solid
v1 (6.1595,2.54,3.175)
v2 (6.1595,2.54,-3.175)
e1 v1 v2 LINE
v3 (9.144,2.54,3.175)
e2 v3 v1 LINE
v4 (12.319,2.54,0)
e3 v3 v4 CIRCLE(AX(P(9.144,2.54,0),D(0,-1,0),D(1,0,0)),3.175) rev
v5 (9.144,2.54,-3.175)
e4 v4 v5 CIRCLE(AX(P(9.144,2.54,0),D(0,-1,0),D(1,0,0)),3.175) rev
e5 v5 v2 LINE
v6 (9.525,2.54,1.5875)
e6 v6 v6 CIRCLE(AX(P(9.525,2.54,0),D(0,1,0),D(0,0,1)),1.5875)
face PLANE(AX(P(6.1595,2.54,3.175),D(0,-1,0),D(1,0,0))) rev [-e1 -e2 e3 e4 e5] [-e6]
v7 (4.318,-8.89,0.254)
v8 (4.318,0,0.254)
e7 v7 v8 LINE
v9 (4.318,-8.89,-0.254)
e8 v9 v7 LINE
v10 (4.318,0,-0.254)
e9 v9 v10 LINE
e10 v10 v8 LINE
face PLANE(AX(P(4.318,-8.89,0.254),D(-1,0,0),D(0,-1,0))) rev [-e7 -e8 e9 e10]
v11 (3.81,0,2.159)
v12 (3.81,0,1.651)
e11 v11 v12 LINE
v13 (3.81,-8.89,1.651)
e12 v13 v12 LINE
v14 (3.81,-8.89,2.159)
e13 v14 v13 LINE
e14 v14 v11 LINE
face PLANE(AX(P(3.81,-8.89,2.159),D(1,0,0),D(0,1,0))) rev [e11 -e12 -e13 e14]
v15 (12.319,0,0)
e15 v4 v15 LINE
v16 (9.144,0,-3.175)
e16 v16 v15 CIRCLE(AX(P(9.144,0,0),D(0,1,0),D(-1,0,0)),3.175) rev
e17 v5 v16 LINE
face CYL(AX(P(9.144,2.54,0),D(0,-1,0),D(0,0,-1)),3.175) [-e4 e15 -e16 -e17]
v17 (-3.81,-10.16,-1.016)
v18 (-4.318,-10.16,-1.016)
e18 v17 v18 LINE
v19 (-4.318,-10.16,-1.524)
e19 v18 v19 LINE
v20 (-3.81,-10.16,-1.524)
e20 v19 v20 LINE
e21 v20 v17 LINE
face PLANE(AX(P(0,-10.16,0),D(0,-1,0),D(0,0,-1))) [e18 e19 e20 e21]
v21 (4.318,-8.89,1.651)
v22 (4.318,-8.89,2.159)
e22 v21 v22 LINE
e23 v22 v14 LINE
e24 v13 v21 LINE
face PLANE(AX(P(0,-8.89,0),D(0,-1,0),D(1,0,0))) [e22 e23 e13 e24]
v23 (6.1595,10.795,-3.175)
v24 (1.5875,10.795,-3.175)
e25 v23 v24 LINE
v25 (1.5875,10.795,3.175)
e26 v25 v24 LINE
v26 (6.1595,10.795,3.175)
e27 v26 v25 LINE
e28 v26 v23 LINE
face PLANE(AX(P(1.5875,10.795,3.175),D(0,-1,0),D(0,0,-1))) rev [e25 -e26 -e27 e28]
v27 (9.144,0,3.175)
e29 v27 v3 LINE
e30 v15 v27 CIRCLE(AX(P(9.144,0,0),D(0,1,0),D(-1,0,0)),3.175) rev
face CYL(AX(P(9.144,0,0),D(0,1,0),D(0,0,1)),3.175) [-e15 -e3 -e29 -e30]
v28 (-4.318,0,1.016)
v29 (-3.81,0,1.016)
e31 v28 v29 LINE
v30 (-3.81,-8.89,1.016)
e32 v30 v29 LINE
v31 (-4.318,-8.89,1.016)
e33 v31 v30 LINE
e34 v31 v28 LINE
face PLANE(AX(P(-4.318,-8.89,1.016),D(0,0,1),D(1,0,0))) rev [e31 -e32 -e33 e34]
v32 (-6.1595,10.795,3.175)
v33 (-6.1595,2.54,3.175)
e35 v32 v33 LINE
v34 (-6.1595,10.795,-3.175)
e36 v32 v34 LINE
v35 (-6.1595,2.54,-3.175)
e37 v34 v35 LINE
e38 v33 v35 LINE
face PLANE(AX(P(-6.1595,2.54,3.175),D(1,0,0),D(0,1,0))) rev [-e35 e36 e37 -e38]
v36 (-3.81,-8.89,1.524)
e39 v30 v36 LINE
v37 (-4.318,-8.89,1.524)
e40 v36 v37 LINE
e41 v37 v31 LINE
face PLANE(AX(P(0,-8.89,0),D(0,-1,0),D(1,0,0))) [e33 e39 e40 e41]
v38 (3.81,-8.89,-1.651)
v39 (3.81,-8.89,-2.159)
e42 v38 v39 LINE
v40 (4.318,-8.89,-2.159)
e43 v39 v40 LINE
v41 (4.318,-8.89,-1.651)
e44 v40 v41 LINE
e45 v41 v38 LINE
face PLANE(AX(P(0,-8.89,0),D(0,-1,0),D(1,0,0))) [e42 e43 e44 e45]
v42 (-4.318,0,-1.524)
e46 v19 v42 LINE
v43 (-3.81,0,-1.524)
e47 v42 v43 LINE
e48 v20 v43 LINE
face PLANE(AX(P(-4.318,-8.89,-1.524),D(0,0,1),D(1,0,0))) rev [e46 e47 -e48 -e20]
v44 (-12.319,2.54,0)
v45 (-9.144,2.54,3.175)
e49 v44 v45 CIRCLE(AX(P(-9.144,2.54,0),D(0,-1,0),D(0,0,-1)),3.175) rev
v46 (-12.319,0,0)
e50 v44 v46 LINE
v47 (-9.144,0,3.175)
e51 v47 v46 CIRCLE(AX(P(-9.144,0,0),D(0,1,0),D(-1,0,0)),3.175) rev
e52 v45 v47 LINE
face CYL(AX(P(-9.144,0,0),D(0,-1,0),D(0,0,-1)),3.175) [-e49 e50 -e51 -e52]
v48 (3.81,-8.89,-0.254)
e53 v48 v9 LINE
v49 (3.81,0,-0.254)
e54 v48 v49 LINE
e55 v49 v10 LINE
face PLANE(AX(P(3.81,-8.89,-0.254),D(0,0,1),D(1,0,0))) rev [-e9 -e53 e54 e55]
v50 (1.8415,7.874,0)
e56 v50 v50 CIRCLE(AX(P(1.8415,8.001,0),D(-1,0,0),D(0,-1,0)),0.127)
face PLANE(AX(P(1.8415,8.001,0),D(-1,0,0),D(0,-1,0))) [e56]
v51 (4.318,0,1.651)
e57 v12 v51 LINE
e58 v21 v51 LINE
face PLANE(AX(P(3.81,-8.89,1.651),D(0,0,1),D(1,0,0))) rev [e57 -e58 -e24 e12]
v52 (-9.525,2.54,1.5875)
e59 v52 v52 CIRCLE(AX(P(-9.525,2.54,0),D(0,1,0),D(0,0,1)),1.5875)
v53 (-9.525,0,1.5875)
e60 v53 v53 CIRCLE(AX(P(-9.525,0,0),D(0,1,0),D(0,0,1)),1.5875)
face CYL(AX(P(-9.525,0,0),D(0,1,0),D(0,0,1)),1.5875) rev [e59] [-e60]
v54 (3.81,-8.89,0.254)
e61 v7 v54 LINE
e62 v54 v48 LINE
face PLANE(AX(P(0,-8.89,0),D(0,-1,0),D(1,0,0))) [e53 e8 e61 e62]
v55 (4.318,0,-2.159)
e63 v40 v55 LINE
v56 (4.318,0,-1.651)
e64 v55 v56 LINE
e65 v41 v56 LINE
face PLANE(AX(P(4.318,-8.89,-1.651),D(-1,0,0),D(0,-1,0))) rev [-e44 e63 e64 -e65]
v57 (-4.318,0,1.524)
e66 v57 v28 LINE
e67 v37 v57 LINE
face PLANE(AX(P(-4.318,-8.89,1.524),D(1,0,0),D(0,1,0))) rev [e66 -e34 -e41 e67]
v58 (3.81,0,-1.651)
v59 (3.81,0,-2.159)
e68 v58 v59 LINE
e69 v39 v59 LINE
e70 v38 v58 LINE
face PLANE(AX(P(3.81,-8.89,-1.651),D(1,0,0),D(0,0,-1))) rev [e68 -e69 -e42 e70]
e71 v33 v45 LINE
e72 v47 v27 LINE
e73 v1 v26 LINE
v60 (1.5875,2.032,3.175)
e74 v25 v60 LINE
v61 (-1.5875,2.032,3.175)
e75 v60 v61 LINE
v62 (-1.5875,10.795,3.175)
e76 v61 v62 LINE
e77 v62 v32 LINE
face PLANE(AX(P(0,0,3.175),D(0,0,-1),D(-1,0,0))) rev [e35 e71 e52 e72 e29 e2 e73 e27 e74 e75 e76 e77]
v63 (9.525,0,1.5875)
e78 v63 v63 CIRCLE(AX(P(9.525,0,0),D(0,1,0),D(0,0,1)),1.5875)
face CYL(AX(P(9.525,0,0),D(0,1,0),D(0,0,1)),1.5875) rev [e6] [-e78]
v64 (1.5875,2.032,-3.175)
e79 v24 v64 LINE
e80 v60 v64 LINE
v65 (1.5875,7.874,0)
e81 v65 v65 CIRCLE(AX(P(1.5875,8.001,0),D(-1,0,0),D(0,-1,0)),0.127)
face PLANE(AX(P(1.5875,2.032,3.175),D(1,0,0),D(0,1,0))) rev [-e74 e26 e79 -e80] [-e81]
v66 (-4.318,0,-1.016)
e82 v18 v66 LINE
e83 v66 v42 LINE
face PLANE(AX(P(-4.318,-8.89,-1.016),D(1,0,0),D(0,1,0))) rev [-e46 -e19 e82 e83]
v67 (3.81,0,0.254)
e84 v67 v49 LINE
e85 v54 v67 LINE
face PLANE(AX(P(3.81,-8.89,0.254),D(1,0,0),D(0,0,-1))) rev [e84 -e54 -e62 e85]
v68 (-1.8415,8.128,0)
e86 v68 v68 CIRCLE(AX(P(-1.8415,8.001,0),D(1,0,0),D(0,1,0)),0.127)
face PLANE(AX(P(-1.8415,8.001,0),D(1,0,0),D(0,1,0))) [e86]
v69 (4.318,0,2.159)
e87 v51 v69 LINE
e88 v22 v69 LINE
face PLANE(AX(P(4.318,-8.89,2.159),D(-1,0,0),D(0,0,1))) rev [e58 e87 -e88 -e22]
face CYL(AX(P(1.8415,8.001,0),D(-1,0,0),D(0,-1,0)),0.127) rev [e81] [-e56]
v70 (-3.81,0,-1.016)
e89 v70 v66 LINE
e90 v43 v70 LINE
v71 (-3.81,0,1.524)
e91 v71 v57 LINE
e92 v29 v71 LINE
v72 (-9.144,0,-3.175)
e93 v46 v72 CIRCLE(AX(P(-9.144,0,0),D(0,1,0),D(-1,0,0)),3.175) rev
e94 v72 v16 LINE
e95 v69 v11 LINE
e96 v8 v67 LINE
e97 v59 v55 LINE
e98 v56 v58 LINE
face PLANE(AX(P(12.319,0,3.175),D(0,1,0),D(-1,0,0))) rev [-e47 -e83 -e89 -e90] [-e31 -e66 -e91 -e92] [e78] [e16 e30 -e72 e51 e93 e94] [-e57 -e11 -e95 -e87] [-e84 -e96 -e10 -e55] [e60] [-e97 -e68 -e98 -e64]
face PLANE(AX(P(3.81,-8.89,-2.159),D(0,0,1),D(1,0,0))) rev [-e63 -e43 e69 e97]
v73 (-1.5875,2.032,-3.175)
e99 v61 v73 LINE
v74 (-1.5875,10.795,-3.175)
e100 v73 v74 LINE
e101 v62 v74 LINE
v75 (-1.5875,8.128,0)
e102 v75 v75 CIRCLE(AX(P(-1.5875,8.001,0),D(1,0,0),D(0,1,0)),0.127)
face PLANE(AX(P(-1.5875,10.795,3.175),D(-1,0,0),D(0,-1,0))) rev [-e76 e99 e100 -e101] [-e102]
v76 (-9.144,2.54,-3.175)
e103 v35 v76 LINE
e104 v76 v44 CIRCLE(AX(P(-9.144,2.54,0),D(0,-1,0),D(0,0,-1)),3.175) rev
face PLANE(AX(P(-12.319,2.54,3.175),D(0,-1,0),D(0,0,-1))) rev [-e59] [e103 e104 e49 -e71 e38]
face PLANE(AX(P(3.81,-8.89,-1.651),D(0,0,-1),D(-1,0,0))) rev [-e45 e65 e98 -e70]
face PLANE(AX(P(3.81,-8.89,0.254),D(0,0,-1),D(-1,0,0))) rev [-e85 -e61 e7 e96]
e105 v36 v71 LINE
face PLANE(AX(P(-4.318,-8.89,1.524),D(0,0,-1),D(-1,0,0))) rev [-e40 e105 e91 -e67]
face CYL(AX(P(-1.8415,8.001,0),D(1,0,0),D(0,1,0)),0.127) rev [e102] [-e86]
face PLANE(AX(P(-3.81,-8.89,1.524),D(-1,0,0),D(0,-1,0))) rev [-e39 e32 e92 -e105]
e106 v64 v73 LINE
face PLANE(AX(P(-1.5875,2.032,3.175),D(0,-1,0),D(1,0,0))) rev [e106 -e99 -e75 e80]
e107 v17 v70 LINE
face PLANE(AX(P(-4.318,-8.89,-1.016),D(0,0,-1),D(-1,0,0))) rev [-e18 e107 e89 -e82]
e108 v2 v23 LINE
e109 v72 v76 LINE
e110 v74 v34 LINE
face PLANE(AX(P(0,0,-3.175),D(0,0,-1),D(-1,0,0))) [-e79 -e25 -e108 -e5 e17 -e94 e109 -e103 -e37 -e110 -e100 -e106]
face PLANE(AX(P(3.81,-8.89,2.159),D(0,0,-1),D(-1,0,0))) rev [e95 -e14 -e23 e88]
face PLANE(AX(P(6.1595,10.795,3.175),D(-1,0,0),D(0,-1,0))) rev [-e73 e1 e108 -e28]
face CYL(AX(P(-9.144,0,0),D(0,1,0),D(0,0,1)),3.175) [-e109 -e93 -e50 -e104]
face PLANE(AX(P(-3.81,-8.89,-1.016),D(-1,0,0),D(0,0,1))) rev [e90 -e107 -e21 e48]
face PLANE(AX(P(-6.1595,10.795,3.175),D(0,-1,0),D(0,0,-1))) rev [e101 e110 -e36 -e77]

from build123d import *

# Parameters (mm, degrees)
BOSS_EXTRUDE1_DEPTH = 3.175
FILLET1_R           = 3.175
SKETCH2_R           = 1.5875
CUT_EXTRUDE1_DEPTH  = 16.165203955
SKETCH3_R           = 0.127
CUT_EXTRUDE2_DEPTH  = 0.254
CUT_EXTRUDE3_START  = -0.254
SKETCH4_R           = 0.127
CUT_EXTRUDE3_DEPTH  = 0.254
SKETCH5_W           = 0.508
SKETCH5_H           = 0.508
BOSS_EXTRUDE2_DEPTH = 8.89
SKETCH6_W           = 0.508
SKETCH6_H           = 0.508
BOSS_EXTRUDE3_DEPTH = 1.27


with BuildPart() as part:
    # Sketch1 → Boss-Extrude1 (new, symmetric)
    with BuildSketch(Plane.XY):
        Polygon((12.319, 0), (-12.319, 0), (-12.319, 2.54), (-6.1595, 2.54), (-6.1595, 10.795), (-1.5875, 10.795), (-1.5875, 2.032), (1.5875, 2.032), (1.5875, 10.795), (6.1595, 10.795), (6.1595, 2.54), (12.319, 2.54), align=None)
    extrude(amount=BOSS_EXTRUDE1_DEPTH, both=True)

    # Fillet1
    fillet1_edges = [part.edges().sort_by_distance(p)[0] for p in [
        (-12.319, 1.27, 3.175),
        (-12.319, 1.27, -3.175),
        (12.319, 1.27, -3.175),
        (12.319, 1.27, 3.175),
    ]]
    fillet(fillet1_edges, radius=FILLET1_R - 0.0001)  # a hair under: the kernel refuses the full size

    # Sketch2 → Cut-Extrude1 (cut, through all)
    with BuildSketch(Plane(origin=(0, 2.54, 0), x_dir=(1, 0, 0), z_dir=(0, 1, 0))):
        with Locations(Location((-9.525, 0, 0), (0, 0, 270))):
            Circle(SKETCH2_R)
        with Locations(Location((9.525, 0, 0), (0, 0, 270))):
            Circle(SKETCH2_R)
    extrude(amount=-CUT_EXTRUDE1_DEPTH, mode=Mode.SUBTRACT)

    # Sketch3 → Cut-Extrude2 (cut)
    with BuildSketch(Plane.ZY.offset(-1.5875)):
        with Locations(Location((0, 8.001, 0), (0, 0, 270))):
            Circle(SKETCH3_R)
    extrude(amount=-CUT_EXTRUDE2_DEPTH, mode=Mode.SUBTRACT)

    # Sketch4 → Cut-Extrude3 (cut)
    with BuildSketch(Plane(origin=(-1.5875, 0, 0), x_dir=(0, 0, -1), z_dir=(1, 0, 0)).offset(CUT_EXTRUDE3_START)):
        with Locations(Location((0, 8.001, 0), (0, 0, 270))):
            Circle(SKETCH4_R)
    extrude(amount=CUT_EXTRUDE3_DEPTH, mode=Mode.SUBTRACT)

    # Sketch5 → Boss-Extrude2 (add)
    with BuildSketch(Plane.XZ):
        with Locations((-4.064, 1.27)):
            Rectangle(SKETCH5_W, SKETCH5_H)
        with Locations((-4.064, -1.27)):
            Rectangle(SKETCH5_W, SKETCH5_H)
        with Locations((4.064, 1.905)):
            Rectangle(SKETCH5_W, SKETCH5_H)
        with Locations((4.064, 0)):
            Rectangle(SKETCH5_W, SKETCH5_H)
        with Locations((4.064, -1.905)):
            Rectangle(SKETCH5_W, SKETCH5_H)
    extrude(amount=BOSS_EXTRUDE2_DEPTH)

    # Sketch6 → Boss-Extrude3 (add)
    with BuildSketch(Plane.XZ.offset(8.89)):
        with Locations((-4.064, -1.27)):
            Rectangle(SKETCH6_W, SKETCH6_H)
    extrude(amount=BOSS_EXTRUDE3_DEPTH)


solid = part.part
